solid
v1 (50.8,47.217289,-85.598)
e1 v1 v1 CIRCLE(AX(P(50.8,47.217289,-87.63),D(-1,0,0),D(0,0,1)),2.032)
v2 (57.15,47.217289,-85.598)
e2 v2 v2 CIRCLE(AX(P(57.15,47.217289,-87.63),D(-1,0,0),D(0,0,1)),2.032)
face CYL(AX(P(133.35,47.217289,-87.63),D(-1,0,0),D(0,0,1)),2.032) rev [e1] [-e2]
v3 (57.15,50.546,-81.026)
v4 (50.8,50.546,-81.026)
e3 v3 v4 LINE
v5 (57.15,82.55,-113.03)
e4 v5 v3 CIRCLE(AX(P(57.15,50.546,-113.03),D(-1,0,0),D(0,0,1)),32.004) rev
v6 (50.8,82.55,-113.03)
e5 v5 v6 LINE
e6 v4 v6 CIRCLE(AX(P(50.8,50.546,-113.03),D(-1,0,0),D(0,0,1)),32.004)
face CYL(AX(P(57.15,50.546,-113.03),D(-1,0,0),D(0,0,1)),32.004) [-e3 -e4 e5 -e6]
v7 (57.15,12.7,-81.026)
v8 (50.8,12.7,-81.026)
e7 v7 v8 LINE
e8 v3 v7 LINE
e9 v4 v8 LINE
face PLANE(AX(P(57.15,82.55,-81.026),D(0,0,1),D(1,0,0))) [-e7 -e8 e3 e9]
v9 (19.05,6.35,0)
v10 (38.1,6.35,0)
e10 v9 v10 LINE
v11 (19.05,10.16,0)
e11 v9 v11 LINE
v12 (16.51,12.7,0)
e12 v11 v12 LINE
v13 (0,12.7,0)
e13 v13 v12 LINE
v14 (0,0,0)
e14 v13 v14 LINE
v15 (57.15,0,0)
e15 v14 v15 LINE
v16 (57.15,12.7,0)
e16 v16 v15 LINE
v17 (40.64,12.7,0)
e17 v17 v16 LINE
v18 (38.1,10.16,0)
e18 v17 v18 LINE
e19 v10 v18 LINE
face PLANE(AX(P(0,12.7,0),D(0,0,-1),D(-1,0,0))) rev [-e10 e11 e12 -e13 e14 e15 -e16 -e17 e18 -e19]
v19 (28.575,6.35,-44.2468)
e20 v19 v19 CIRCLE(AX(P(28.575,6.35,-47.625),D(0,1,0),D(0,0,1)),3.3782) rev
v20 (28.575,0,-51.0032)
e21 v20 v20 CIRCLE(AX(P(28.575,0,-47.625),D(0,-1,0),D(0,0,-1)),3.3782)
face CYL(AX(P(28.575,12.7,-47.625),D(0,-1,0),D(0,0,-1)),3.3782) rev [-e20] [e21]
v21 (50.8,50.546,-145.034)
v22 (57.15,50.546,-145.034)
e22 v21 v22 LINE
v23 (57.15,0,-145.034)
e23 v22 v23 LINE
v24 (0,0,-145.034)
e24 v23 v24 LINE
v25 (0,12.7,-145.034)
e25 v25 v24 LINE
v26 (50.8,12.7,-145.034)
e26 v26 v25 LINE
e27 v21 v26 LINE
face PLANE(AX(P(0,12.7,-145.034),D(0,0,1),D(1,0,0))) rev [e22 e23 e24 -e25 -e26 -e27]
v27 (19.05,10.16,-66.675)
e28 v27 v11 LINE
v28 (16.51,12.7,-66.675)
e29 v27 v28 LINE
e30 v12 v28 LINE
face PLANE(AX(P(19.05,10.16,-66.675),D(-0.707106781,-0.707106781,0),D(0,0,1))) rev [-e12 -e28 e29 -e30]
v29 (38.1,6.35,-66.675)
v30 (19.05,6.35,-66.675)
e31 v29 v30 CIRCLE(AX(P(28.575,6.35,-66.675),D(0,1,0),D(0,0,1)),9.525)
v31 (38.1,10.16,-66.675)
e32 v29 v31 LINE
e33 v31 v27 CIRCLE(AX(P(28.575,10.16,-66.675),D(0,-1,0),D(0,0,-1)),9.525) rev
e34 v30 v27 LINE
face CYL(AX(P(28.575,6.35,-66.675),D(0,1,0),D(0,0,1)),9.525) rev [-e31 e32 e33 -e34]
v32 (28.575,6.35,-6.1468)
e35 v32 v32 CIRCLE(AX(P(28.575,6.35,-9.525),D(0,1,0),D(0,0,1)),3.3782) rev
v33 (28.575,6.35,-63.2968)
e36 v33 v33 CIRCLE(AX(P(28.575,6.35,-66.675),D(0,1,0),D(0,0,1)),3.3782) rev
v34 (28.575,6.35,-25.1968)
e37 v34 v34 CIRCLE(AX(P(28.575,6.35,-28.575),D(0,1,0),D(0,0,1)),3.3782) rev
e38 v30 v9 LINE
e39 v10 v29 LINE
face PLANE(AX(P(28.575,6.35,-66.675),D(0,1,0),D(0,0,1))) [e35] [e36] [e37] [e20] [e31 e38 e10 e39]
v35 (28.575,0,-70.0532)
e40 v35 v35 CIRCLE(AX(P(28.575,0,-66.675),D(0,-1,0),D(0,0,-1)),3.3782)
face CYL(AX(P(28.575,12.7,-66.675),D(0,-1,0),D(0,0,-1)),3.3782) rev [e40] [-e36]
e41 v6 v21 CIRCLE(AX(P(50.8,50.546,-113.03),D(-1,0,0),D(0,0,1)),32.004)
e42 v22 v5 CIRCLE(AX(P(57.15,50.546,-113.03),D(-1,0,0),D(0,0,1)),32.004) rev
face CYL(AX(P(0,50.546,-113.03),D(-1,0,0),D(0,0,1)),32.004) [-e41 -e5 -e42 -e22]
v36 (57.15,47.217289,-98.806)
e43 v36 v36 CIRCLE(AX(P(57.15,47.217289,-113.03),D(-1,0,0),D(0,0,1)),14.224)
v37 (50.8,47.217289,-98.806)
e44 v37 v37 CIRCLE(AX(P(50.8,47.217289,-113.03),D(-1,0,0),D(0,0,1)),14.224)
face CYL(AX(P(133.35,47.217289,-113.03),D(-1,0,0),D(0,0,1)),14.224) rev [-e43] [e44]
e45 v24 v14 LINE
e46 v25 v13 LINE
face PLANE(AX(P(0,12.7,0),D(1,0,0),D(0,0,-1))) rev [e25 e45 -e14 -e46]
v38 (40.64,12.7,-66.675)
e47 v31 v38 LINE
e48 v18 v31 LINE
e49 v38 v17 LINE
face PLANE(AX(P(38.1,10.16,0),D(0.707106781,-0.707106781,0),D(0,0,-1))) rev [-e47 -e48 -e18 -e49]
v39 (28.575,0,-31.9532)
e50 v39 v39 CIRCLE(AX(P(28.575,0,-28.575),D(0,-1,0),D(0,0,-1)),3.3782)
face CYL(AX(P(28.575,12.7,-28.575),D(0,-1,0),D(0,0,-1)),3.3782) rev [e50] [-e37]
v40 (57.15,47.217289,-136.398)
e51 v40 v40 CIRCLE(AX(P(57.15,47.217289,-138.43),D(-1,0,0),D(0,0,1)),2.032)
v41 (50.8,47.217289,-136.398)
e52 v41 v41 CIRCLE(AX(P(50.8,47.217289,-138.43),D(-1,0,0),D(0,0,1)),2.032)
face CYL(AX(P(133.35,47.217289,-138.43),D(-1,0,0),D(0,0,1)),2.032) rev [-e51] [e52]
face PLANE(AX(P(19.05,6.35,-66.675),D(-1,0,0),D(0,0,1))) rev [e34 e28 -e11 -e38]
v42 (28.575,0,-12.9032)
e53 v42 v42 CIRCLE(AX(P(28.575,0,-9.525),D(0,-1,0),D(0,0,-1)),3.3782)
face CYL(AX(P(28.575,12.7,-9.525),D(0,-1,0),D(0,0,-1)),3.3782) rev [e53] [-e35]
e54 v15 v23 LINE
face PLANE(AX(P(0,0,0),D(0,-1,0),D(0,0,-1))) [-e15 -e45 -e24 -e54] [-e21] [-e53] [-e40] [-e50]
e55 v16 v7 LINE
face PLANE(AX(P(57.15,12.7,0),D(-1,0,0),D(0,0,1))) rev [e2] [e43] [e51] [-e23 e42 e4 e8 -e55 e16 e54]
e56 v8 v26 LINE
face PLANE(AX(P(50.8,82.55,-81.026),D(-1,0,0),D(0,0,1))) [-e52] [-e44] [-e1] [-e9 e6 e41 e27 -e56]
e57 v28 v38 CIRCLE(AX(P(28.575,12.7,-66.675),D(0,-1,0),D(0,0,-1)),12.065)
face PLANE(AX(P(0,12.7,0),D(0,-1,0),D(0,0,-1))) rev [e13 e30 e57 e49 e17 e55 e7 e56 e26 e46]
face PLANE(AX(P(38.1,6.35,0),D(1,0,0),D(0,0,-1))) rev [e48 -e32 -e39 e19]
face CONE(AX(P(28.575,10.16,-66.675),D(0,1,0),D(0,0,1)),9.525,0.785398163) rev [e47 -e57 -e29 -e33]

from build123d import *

# Parameters (mm, degrees)
SKETCH1_W           = 57.15
SKETCH1_H           = 145.034
BOSS_EXTRUDE1_DEPTH = 12.7
SKETCH4_R           = 3.3782
CUT_EXTRUDE3_DEPTH  = 157.404199611
CUT_EXTRUDE4_DEPTH  = 6.35
CHAMFER1_SIZE       = 2.54
SKETCH7_W           = 6.35
SKETCH7_H           = 64.008
BOSS_EXTRUDE2_DEPTH = 82.55
SKETCH9_R           = 14.224
SKETCH9_R_2         = 2.032
CUT_EXTRUDE5_DEPTH  = 82.55
FILLET1_R           = 32.004


with BuildPart() as part:
    # Sketch1 → Boss-Extrude1 (new body)
    with BuildSketch(Plane(origin=(0, 0, 0), x_dir=(1, 0, 0), z_dir=(0, 1, 0))):
        with Locations((28.575, 72.517)):
            Rectangle(SKETCH1_W, SKETCH1_H)
    extrude(amount=BOSS_EXTRUDE1_DEPTH)

    # Sketch4 → Cut-Extrude3 (cut, through all)
    with BuildSketch(Plane(origin=(0, 0, 0), x_dir=(-1, 0, 0), z_dir=(0, -1, 0))):
        with Locations(Location((-28.575, 9.525, 0), (0, 0, 90))):
            Circle(SKETCH4_R)
        with Locations(Location((-28.575, 28.575, 0), (0, 0, 90))):
            Circle(SKETCH4_R)
        with Locations(Location((-28.575, 47.625, 0), (0, 0, 90))):
            Circle(SKETCH4_R)
        with Locations(Location((-28.575, 66.675, 0), (0, 0, 90))):
            Circle(SKETCH4_R)
    extrude(amount=-CUT_EXTRUDE3_DEPTH, mode=Mode.SUBTRACT)

    # Sketch8 → Cut-Extrude4 (cut)
    with BuildSketch(Plane(origin=(0, 12.7, 0), x_dir=(1, 0, 0), z_dir=(0, 1, 0))):
        with BuildLine():
            Line((19.05, 66.675), (19.05, 0))
            Line((19.05, 0), (38.1, 0))
            Line((38.1, 0), (38.1, 66.675))
            ThreePointArc((38.1, 66.675), (28.575, 76.2), (19.05, 66.675))
        make_face()
    extrude(amount=-CUT_EXTRUDE4_DEPTH, mode=Mode.SUBTRACT)

    # Chamfer1
    chamfer1_edges = [part.edges().sort_by_distance(p)[0] for p in [
        (28.575, 12.7, -76.2),
        (19.05, 12.7, -33.3375),
        (38.1, 12.7, -33.3375),
    ]]
    chamfer(chamfer1_edges, length=CHAMFER1_SIZE)

    # Sketch7 → Boss-Extrude2 (add)
    with BuildSketch(Plane.XZ):
        with Locations((53.975, -113.03)):
            Rectangle(SKETCH7_W, SKETCH7_H)
    extrude(amount=-BOSS_EXTRUDE2_DEPTH)

    # Sketch9 → Cut-Extrude5 (cut)
    with BuildSketch(Plane.ZY.offset(-50.8)):
        with Locations((-113.03, 47.217289291)):
            Circle(SKETCH9_R)
        with Locations((-87.63, 47.217289291)):
            Circle(SKETCH9_R_2)
        with Locations((-138.43, 47.217289291)):
            Circle(SKETCH9_R_2)
    extrude(amount=-CUT_EXTRUDE5_DEPTH, mode=Mode.SUBTRACT)

    # Fillet1
    fillet1_edges = [part.edges().sort_by_distance(p)[0] for p in [
        (53.975, 82.55, -81.026),
        (53.975, 82.55, -145.034),
    ]]
    fillet(fillet1_edges, radius=FILLET1_R - 0.0001)  # a hair under: the kernel refuses the full size


solid = part.part
